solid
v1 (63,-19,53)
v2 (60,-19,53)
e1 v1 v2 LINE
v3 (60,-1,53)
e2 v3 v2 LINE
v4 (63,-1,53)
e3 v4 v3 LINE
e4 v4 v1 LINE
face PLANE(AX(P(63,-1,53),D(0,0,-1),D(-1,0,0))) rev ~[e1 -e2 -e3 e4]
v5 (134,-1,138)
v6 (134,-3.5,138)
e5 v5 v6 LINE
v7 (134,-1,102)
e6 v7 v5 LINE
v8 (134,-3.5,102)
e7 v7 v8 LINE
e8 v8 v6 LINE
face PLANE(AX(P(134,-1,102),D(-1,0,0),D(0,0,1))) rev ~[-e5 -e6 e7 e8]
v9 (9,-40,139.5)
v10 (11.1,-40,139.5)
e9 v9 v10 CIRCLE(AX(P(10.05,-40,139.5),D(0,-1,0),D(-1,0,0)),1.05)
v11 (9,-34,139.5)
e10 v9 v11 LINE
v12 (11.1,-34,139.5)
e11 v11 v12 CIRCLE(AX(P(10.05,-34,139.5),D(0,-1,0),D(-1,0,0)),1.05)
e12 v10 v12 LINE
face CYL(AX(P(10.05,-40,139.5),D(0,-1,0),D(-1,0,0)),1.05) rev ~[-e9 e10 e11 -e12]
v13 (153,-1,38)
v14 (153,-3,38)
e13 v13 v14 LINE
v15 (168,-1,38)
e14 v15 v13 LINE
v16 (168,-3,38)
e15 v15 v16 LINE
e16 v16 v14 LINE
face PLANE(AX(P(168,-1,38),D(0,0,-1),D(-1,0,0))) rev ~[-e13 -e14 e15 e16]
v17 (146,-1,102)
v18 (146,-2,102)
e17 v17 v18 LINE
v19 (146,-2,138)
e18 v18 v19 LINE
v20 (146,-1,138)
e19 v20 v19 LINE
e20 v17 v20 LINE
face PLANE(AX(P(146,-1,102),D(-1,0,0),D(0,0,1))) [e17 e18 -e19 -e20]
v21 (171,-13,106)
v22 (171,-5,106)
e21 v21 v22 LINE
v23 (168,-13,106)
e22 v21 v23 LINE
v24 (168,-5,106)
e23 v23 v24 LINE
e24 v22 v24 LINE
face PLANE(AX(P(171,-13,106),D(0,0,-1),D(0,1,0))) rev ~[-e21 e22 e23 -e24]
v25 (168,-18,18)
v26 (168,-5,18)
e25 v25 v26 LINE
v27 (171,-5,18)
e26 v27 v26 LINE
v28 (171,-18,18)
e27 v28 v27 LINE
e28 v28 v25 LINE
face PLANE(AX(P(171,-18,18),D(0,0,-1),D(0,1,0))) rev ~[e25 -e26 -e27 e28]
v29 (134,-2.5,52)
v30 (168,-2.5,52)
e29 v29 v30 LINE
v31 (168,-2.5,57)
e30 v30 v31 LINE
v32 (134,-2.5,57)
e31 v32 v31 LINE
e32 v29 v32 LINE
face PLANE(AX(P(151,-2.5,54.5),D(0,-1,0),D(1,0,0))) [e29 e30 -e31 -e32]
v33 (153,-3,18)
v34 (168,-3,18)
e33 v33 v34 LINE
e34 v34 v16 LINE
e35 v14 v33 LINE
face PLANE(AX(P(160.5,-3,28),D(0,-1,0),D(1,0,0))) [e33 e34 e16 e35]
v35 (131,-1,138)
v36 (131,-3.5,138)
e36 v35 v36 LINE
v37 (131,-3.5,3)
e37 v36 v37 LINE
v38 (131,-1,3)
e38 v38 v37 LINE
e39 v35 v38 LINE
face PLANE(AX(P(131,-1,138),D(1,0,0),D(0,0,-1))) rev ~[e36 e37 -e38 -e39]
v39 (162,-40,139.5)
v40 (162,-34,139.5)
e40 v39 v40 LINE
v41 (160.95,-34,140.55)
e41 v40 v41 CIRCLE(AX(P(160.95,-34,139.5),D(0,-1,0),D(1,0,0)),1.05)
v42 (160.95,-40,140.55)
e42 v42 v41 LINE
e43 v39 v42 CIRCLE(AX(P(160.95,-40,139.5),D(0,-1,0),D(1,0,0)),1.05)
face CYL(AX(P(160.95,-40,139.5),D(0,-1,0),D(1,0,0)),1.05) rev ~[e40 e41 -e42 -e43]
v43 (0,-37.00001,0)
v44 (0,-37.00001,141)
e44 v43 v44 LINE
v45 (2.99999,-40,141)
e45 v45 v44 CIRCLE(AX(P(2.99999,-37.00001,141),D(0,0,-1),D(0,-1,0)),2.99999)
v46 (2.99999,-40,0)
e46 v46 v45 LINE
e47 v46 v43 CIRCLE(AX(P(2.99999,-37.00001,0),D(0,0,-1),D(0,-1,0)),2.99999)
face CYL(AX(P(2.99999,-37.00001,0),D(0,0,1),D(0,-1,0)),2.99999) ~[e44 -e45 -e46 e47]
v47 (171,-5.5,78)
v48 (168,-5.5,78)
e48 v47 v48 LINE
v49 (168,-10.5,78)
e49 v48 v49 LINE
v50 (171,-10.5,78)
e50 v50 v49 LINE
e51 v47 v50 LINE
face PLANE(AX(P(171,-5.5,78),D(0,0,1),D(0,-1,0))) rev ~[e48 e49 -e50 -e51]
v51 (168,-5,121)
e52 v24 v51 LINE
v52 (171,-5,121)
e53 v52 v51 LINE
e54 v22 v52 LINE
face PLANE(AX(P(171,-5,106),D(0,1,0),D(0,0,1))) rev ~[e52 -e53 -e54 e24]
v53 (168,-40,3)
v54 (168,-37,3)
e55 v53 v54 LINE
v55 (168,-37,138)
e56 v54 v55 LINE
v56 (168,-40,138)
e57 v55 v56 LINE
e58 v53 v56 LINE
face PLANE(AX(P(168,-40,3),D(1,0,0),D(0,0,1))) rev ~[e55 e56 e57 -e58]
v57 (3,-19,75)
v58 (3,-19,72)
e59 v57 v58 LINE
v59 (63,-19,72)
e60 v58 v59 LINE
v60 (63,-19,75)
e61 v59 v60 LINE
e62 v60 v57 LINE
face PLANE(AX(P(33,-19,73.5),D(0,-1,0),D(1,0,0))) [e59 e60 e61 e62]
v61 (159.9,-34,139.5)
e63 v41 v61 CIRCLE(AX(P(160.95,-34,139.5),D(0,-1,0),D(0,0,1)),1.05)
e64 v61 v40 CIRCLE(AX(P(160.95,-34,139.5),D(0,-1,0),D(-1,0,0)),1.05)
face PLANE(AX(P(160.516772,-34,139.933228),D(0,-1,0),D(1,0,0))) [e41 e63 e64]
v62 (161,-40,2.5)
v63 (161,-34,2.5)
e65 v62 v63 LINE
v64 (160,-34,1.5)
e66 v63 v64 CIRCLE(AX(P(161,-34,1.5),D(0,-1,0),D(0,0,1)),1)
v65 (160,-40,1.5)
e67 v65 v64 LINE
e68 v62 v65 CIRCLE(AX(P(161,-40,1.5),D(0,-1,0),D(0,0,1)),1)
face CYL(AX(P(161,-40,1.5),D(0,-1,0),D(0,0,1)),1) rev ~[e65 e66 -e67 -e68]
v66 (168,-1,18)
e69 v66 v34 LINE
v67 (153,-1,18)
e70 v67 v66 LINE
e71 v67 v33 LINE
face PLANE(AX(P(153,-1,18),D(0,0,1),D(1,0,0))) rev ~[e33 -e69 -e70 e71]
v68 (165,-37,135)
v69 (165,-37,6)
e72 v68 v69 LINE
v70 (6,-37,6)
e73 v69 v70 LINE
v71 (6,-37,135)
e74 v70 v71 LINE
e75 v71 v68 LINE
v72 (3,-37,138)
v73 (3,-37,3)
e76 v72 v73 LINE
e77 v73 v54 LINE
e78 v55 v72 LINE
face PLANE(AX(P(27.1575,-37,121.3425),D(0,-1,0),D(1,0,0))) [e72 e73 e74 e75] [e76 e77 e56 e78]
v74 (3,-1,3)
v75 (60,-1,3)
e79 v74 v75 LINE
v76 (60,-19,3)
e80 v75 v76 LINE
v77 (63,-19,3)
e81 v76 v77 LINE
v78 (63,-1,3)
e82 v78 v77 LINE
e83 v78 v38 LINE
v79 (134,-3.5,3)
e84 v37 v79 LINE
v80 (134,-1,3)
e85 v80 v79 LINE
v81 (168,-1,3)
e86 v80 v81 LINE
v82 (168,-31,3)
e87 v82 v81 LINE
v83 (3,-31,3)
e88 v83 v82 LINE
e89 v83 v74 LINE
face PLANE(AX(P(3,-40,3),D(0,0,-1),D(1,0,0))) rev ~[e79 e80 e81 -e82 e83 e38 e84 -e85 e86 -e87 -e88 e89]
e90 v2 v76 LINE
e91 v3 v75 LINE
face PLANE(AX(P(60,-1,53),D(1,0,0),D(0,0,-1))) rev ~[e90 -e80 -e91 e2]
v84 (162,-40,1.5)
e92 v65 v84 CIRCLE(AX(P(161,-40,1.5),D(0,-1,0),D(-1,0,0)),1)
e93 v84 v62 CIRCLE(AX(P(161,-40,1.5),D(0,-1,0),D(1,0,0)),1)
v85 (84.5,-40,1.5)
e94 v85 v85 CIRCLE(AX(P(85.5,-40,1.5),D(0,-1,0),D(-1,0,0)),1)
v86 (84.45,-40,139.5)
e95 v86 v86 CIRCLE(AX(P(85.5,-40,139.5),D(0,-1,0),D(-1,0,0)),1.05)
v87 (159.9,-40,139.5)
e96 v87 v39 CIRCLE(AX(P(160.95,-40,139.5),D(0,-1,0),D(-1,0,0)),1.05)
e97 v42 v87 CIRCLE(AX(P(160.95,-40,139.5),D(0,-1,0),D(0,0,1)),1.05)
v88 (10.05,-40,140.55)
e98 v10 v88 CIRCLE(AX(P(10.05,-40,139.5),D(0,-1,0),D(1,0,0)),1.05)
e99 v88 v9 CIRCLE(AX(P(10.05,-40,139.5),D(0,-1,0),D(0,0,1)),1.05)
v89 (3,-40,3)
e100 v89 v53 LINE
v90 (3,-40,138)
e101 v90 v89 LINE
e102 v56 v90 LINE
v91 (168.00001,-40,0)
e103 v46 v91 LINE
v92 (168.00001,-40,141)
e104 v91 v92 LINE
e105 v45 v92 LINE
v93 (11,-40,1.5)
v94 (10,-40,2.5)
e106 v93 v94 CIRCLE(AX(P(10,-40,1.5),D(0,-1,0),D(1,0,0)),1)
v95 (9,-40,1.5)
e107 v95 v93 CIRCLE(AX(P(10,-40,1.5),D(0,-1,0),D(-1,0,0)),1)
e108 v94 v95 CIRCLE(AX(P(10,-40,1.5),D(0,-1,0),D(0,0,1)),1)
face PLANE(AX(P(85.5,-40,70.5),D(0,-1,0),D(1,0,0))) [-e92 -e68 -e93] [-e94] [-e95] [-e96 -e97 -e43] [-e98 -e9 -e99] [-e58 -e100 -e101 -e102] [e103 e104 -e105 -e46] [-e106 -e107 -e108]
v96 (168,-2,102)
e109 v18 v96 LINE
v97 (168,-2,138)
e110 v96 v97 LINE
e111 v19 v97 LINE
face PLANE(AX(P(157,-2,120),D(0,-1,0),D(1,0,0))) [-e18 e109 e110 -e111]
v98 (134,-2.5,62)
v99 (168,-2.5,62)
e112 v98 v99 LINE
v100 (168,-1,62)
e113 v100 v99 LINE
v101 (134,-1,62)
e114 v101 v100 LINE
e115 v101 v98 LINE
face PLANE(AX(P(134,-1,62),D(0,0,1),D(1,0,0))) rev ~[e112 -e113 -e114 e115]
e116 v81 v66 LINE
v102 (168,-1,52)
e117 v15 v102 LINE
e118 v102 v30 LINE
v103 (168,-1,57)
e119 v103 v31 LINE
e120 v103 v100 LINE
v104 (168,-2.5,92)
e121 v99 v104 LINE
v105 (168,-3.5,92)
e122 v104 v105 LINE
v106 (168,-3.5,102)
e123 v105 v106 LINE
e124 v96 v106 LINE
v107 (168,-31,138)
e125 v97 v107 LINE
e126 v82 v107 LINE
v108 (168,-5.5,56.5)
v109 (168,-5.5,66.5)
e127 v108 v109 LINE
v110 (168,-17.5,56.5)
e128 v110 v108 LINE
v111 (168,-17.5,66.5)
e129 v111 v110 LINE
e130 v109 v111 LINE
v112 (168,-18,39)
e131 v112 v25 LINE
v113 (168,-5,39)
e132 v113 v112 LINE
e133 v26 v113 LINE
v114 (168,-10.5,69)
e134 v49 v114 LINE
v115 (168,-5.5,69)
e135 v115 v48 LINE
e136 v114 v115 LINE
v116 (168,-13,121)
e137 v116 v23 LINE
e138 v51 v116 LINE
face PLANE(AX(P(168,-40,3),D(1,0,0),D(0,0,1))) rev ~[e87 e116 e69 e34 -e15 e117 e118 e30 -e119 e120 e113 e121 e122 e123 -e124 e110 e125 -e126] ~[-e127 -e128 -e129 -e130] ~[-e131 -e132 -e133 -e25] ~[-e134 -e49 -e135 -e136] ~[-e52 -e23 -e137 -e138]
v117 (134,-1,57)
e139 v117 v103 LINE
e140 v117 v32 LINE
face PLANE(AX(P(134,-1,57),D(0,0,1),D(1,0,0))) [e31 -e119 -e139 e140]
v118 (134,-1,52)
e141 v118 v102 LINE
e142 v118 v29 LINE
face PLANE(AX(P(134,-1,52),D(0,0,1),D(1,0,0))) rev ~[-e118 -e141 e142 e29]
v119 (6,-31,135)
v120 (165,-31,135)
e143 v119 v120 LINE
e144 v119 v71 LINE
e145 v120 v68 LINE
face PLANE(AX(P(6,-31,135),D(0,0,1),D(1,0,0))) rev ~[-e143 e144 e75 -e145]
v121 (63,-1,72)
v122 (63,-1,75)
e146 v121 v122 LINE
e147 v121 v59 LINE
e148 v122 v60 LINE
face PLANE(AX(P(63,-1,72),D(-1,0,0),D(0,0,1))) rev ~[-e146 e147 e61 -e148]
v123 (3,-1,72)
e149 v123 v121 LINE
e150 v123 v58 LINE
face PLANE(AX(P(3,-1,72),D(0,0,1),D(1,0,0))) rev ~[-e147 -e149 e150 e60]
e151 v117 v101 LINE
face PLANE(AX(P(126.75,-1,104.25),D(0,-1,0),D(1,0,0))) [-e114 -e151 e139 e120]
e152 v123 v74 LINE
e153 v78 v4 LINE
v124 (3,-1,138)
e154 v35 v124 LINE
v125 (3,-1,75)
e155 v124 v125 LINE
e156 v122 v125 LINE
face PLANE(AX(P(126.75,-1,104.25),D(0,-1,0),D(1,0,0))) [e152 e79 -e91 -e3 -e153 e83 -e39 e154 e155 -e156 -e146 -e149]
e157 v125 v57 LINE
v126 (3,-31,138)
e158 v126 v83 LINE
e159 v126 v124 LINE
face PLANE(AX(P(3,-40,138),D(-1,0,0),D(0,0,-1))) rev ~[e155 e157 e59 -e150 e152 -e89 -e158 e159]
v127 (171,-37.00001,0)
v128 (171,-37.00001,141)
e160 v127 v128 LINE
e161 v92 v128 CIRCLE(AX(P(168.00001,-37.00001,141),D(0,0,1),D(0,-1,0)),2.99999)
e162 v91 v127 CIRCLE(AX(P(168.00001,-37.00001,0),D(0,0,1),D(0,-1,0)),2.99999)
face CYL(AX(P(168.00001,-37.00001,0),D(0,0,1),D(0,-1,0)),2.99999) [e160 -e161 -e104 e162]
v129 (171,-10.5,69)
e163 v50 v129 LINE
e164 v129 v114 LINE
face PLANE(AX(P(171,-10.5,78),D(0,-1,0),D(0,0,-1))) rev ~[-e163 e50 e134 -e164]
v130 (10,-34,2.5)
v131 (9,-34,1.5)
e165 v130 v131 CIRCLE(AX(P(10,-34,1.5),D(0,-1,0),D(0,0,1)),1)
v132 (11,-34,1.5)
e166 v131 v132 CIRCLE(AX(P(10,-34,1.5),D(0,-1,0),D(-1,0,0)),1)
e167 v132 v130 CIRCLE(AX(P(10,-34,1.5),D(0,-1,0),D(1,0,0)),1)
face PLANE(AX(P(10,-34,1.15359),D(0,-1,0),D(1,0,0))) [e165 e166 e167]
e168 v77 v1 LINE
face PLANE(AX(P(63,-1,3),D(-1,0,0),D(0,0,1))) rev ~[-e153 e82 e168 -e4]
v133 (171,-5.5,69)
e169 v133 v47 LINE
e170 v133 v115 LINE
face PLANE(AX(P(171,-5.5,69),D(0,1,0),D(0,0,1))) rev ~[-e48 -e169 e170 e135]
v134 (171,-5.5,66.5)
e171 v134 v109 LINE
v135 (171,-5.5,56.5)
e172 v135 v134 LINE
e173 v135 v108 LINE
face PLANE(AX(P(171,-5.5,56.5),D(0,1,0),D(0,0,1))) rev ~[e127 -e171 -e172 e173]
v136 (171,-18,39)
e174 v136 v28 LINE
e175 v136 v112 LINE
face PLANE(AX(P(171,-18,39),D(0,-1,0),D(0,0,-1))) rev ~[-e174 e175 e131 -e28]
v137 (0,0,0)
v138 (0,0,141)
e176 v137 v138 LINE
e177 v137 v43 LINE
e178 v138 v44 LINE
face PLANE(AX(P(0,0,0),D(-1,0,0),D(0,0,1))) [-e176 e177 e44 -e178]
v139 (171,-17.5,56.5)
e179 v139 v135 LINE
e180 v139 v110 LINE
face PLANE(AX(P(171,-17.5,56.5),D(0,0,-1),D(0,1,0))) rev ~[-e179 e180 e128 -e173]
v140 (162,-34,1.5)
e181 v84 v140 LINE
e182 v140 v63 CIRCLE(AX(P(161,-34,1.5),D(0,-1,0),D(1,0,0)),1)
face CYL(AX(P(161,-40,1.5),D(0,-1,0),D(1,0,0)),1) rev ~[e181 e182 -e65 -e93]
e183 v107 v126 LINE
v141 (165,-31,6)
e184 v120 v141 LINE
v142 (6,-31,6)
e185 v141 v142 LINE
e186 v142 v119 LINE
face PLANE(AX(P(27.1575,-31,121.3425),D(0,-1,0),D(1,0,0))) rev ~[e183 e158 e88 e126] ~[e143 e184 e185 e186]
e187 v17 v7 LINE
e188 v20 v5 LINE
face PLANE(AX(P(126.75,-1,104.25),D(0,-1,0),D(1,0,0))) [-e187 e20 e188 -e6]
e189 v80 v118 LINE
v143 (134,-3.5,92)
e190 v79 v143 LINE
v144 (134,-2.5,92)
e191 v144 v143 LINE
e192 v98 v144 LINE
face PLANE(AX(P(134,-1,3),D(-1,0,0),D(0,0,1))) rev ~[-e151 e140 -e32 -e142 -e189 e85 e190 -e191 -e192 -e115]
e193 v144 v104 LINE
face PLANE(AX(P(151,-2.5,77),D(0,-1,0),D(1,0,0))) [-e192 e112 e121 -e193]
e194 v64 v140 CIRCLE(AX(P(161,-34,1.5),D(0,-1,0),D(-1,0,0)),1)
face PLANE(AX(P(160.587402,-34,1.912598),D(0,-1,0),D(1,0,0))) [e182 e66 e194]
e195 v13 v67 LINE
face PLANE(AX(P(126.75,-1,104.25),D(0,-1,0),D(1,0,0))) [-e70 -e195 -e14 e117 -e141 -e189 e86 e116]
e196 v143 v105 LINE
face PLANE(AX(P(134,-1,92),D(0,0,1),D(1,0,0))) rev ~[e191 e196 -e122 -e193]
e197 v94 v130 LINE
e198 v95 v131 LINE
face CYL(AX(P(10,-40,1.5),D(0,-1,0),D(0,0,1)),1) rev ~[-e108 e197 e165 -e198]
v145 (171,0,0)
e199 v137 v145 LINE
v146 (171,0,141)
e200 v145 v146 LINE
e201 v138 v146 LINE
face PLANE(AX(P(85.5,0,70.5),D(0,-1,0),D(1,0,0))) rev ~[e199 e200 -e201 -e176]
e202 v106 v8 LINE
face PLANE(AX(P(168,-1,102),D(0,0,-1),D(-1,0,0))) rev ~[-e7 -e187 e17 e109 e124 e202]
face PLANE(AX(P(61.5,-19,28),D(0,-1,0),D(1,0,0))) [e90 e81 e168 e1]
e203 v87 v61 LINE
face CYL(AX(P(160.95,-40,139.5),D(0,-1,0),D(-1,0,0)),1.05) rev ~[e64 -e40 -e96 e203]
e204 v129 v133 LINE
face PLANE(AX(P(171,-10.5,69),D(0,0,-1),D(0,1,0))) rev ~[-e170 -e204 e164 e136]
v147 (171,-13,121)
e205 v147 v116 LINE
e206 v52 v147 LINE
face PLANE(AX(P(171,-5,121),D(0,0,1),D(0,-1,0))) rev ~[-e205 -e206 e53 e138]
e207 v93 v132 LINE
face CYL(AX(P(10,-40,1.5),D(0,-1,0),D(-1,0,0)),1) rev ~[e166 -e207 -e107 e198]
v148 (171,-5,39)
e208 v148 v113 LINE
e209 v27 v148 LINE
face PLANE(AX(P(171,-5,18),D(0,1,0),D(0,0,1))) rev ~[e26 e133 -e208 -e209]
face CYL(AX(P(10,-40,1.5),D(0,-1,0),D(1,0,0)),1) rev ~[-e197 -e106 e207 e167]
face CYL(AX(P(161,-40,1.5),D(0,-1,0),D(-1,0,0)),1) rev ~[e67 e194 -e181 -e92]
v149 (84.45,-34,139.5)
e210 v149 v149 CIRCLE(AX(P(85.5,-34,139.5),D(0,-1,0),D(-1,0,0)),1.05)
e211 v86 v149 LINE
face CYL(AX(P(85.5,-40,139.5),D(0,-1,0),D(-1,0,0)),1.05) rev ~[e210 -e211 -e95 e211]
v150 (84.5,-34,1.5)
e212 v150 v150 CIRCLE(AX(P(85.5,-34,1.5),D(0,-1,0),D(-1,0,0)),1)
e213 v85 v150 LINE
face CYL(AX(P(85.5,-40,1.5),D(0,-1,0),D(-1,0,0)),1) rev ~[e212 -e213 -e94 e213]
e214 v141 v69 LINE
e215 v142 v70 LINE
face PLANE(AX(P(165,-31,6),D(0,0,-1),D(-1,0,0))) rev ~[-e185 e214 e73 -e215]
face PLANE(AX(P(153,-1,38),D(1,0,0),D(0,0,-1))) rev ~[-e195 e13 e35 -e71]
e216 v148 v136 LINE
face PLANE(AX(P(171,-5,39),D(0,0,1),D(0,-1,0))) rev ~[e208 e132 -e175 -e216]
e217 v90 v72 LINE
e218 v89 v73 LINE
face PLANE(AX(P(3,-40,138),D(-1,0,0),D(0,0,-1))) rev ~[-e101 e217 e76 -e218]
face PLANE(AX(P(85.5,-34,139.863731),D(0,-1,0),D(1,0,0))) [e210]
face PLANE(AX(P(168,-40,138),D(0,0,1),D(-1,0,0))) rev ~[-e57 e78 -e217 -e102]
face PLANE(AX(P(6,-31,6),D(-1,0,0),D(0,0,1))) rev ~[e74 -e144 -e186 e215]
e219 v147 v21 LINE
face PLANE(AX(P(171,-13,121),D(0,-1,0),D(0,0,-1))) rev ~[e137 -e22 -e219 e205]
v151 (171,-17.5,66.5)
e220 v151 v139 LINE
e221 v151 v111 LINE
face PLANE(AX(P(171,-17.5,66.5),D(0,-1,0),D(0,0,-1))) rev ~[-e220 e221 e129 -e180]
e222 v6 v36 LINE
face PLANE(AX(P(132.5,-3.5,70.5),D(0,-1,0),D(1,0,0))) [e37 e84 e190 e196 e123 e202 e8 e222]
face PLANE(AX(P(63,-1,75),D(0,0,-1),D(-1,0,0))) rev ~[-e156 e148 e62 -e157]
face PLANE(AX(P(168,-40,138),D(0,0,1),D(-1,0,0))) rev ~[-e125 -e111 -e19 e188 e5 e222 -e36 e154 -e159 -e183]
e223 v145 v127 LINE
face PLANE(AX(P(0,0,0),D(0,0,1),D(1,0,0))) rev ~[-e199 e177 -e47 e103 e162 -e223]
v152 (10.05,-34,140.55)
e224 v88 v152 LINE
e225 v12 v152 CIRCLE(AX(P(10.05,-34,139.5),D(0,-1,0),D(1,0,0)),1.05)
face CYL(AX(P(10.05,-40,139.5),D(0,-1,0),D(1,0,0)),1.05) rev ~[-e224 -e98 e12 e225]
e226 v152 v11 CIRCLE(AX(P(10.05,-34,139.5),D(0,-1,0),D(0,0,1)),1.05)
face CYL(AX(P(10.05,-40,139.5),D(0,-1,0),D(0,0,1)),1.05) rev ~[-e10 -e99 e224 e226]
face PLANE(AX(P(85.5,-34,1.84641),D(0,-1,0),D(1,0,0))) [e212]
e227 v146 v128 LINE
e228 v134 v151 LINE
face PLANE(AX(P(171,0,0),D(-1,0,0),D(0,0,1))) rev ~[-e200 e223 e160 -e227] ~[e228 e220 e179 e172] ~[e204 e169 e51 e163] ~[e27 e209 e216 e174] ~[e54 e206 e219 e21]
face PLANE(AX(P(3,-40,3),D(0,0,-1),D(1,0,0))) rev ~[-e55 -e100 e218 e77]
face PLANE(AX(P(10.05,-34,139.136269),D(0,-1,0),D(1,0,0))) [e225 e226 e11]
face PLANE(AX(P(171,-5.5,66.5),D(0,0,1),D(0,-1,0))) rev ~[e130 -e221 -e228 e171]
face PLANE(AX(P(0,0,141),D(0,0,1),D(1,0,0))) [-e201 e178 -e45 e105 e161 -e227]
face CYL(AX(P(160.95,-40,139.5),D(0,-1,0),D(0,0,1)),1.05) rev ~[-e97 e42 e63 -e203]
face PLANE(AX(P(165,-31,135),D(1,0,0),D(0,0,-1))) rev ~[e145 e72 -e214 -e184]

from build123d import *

# Parameters (mm, degrees)
F0_W      = 171
F0_H      = 141
F1_DEPTH  = 40
F2_W      = 82.5
F2_H      = 67.5
F3_DEPTH  = 3
F4_W      = 80.5
F4_H      = 65.5
F5_DEPTH  = 3
F6_W      = 82.5
F6_H      = 67.5
F7_DEPTH  = 36
F9_START  = 30
F9_DEPTH  = 6
F11_DEPTH = 39.9
F12_R     = 2.99999
F13_R     = 2.99999
F15_DEPTH = 87.6
F17_DEPTH = 58
F19_DEPTH = 2.5
F20_W     = 34
F20_H     = 30
F20_H_2   = 5
F21_DEPTH = 1.5
F22_W     = 22
F22_H     = 36
F23_DEPTH = 1
F25_DEPTH = 107.7
F27_DEPTH = 2
F29_DEPTH = 18
F31_DEPTH = 6
F33_DEPTH = 6


# Not quite as in the source:
# - a fillet or chamfer is up to 0.001 mm smaller than in the source, because OpenCascade refuses the exact size


with BuildPart() as f1:
    # F0 (on Front) → F1 (new body)
    with BuildSketch(Plane.XZ):
        with Locations((85.5, 70.5)):
            Rectangle(F0_W, F0_H)
    extrude(amount=F1_DEPTH)

    # F2 (on face) → F3 (cut)
    with BuildSketch(Plane.XZ.offset(40)):
        with Locations((126.75, 104.25)):
            Rectangle(F2_W, F2_H)
        with Locations((44.25, 104.25)):
            Rectangle(F2_W, F2_H)
        with Locations((126.75, 36.75)):
            Rectangle(F2_W, F2_H)
        with Locations((44.25, 36.75)):
            Rectangle(F2_W, F2_H)
    extrude(amount=-F3_DEPTH, mode=Mode.SUBTRACT)

    # F4 (on face) → F5 (cut)
    with BuildSketch(Plane.XZ.offset(37)):
        with Locations((45.25, 103.25)):
            Rectangle(F4_W, F4_H)
        with Locations((125.75, 103.25)):
            Rectangle(F4_W, F4_H)
        with Locations((125.75, 37.75)):
            Rectangle(F4_W, F4_H)
        with Locations((45.25, 37.75)):
            Rectangle(F4_W, F4_H)
    extrude(amount=-F5_DEPTH, mode=Mode.SUBTRACT)

    # F6 (on face) → F7 (cut)
    with BuildSketch(Plane.XZ.offset(37)):
        with Locations((126.75, 104.25)):
            Rectangle(F6_W, F6_H)
        with Locations((44.25, 104.25)):
            Rectangle(F6_W, F6_H)
        with Locations((126.75, 36.75)):
            Rectangle(F6_W, F6_H)
        with Locations((44.25, 36.75)):
            Rectangle(F6_W, F6_H)
    extrude(amount=-F7_DEPTH, mode=Mode.SUBTRACT)

    # F8 (on face) → F9 (join)
    with BuildSketch(Plane.XZ.offset(1).offset(F9_START)):
        Polygon((3, 138), (3, 70.5), (6, 70.5), (6, 135), (85.5, 135), (85.5, 138), align=None)
        Polygon((3, 70.5), (3, 3), (85.5, 3), (85.5, 6), (6, 6), (6, 70.5), align=None)
        Polygon((85.5, 6), (85.5, 3), (168, 3), (168, 70.5), (165, 70.5), (165, 6), align=None)
        Polygon((165, 70.5), (168, 70.5), (168, 138), (85.5, 138), (85.5, 135), (165, 135), align=None)
    extrude(amount=F9_DEPTH)

    # F10 (on face) → F11 (cut)
    with BuildSketch(Plane.YZ.offset(171)):
        Polygon((-13, 121), (-13, 106), (-5, 106), (-5, 113.5), (-5, 121), (-9, 121), align=None)
    extrude(amount=-F11_DEPTH, mode=Mode.SUBTRACT)

    # F12 (radius 3 in the source; OpenCascade refuses exactly that, so slightly less here)
    f12_edges = [f1.edges().sort_by_distance(p)[0] for p in [
        (171, -40, 70.5),
    ]]
    fillet(f12_edges, radius=F12_R)

    # F13 (radius 3 in the source; OpenCascade refuses exactly that, so slightly less here)
    f13_edges = [f1.edges().sort_by_distance(p)[0] for p in [
        (0, -40, 70.5),
    ]]
    fillet(f13_edges, radius=F13_R)

    # F14 (on face) → F15 (cut)
    with BuildSketch(Plane.YZ.offset(171)):
        Polygon((-10.5, 78), (-10.5, 69), (-5.5, 69), (-5.5, 73.5), (-5.5, 78), (-8, 78), align=None)
    extrude(amount=-F15_DEPTH, mode=Mode.SUBTRACT)

    # F16 (on face) → F17 (cut)
    with BuildSketch(Plane.YZ.offset(171)):
        Polygon((-17.5, 66.5), (-17.5, 56.5), (-5.5, 56.5), (-5.5, 61.5), (-5.5, 66.5), (-11.5, 66.5), align=None)
    extrude(amount=-F17_DEPTH, mode=Mode.SUBTRACT)

    # F18 (on face) → F19 (join)
    with BuildSketch(Plane.XZ.offset(1)):
        Polygon((134, 138), (131, 138), (131, 3), (134, 3), (134, 70.5), (134, 92), (134, 102), align=None)
        Polygon((151, 102), (134, 102), (134, 92), (168, 92), (168, 102), align=None)
    extrude(amount=F19_DEPTH)

    # F20 (on face) → F21 (join)
    with BuildSketch(Plane.XZ.offset(1)):
        with Locations((151, 77)):
            Rectangle(F20_W, F20_H)
        with Locations((151, 54.5)):
            Rectangle(F20_W, F20_H_2)
    extrude(amount=F21_DEPTH)

    # F22 (on face) → F23 (join)
    with BuildSketch(Plane.XZ.offset(1)):
        with Locations((157, 120)):
            Rectangle(F22_W, F22_H)
    extrude(amount=F23_DEPTH)

    # F24 (on face) → F25 (cut)
    with BuildSketch(Plane.YZ.offset(171)):
        Polygon((-18, 39), (-18, 18), (-11.5, 18), (-5, 18), (-5, 28.5), (-5, 39), align=None)
    extrude(amount=-F25_DEPTH, mode=Mode.SUBTRACT)

    # F26 (on face) → F27 (join)
    with BuildSketch(Plane.XZ.offset(1)):
        Polygon((168, 18), (168, 38), (153, 38), (153, 18), (160.5, 18), align=None)
    extrude(amount=F27_DEPTH)

    # F28 (on face) → F29 (join)
    with BuildSketch(Plane.XZ.offset(1)):
        Polygon((60, 53), (60, 28), (60, 3), (63, 3), (63, 53), align=None)
        Polygon((63, 75), (3, 75), (3, 72), (33, 72), (63, 72), align=None)
    extrude(amount=F29_DEPTH)

    # F30 (on face) → F31 (cut)
    with BuildSketch(Plane.XZ.offset(40)):
        with BuildLine():
            Line((10.05, 139.5), (9, 139.5))
            ThreePointArc((9, 139.5), (10.05, 138.45), (11.1, 139.5))
            Line((11.1, 139.5), (10.05, 139.5))
        make_face()
        with BuildLine():
            ThreePointArc((160.95, 140.55), (160.2075378798, 140.2424621202), (159.9, 139.5))
            Line((159.9, 139.5), (160.95, 139.5))
            Line((160.95, 139.5), (160.95, 140.55))
        make_face()
        with BuildLine():
            Line((160.95, 139.5), (159.9, 139.5))
            ThreePointArc((159.9, 139.5), (160.95, 138.45), (162, 139.5))
            Line((162, 139.5), (160.95, 139.5))
        make_face()
        with BuildLine():
            ThreePointArc((86.55, 139.5), (85.5, 140.55), (84.45, 139.5))
            Line((84.45, 139.5), (86.55, 139.5))
        make_face()
        with BuildLine():
            Line((86.55, 139.5), (84.45, 139.5))
            ThreePointArc((84.45, 139.5), (85.5, 138.45), (86.55, 139.5))
        make_face()
        with BuildLine():
            ThreePointArc((10.05, 140.55), (9.3075378798, 140.2424621202), (9, 139.5))
            Line((9, 139.5), (10.05, 139.5))
            Line((10.05, 139.5), (10.05, 140.55))
        make_face()
        with BuildLine():
            Line((10.05, 139.5), (11.1, 139.5))
            ThreePointArc((11.1, 139.5), (10.7924621202, 140.2424621202), (10.05, 140.55))
            Line((10.05, 140.55), (10.05, 139.5))
        make_face()
        with BuildLine():
            ThreePointArc((162, 139.5), (161.6924621202, 140.2424621202), (160.95, 140.55))
            Line((160.95, 140.55), (160.95, 139.5))
            Line((160.95, 139.5), (162, 139.5))
        make_face()
    extrude(amount=-F31_DEPTH, mode=Mode.SUBTRACT)

    # F32 (on face) → F33 (cut)
    with BuildSketch(Plane.XZ.offset(40)):
        with BuildLine():
            Line((10, 1.5), (9, 1.5))
            ThreePointArc((9, 1.5), (10, 0.5), (11, 1.5))
            Line((11, 1.5), (10, 1.5))
        make_face()
        with BuildLine():
            ThreePointArc((161, 2.5), (160.2928932188, 2.2071067812), (160, 1.5))
            Line((160, 1.5), (161, 1.5))
            Line((161, 1.5), (161, 2.5))
        make_face()
        with BuildLine():
            Line((161, 1.5), (160, 1.5))
            ThreePointArc((160, 1.5), (161, 0.5), (162, 1.5))
            Line((162, 1.5), (161, 1.5))
        make_face()
        with BuildLine():
            ThreePointArc((86.5, 1.5), (85.5, 2.5), (84.5, 1.5))
            Line((84.5, 1.5), (86.5, 1.5))
        make_face()
        with BuildLine():
            Line((86.5, 1.5), (84.5, 1.5))
            ThreePointArc((84.5, 1.5), (85.5, 0.5), (86.5, 1.5))
        make_face()
        with BuildLine():
            ThreePointArc((10, 2.5), (9.2928932188, 2.2071067812), (9, 1.5))
            Line((9, 1.5), (10, 1.5))
            Line((10, 1.5), (10, 2.5))
        make_face()
        with BuildLine():
            Line((10, 1.5), (11, 1.5))
            ThreePointArc((11, 1.5), (10.7071067812, 2.2071067812), (10, 2.5))
            Line((10, 2.5), (10, 1.5))
        make_face()
        with BuildLine():
            ThreePointArc((162, 1.5), (161.7071067812, 2.2071067812), (161, 2.5))
            Line((161, 2.5), (161, 1.5))
            Line((161, 1.5), (162, 1.5))
        make_face()
    extrude(amount=-F33_DEPTH, mode=Mode.SUBTRACT)


solid = f1.part
